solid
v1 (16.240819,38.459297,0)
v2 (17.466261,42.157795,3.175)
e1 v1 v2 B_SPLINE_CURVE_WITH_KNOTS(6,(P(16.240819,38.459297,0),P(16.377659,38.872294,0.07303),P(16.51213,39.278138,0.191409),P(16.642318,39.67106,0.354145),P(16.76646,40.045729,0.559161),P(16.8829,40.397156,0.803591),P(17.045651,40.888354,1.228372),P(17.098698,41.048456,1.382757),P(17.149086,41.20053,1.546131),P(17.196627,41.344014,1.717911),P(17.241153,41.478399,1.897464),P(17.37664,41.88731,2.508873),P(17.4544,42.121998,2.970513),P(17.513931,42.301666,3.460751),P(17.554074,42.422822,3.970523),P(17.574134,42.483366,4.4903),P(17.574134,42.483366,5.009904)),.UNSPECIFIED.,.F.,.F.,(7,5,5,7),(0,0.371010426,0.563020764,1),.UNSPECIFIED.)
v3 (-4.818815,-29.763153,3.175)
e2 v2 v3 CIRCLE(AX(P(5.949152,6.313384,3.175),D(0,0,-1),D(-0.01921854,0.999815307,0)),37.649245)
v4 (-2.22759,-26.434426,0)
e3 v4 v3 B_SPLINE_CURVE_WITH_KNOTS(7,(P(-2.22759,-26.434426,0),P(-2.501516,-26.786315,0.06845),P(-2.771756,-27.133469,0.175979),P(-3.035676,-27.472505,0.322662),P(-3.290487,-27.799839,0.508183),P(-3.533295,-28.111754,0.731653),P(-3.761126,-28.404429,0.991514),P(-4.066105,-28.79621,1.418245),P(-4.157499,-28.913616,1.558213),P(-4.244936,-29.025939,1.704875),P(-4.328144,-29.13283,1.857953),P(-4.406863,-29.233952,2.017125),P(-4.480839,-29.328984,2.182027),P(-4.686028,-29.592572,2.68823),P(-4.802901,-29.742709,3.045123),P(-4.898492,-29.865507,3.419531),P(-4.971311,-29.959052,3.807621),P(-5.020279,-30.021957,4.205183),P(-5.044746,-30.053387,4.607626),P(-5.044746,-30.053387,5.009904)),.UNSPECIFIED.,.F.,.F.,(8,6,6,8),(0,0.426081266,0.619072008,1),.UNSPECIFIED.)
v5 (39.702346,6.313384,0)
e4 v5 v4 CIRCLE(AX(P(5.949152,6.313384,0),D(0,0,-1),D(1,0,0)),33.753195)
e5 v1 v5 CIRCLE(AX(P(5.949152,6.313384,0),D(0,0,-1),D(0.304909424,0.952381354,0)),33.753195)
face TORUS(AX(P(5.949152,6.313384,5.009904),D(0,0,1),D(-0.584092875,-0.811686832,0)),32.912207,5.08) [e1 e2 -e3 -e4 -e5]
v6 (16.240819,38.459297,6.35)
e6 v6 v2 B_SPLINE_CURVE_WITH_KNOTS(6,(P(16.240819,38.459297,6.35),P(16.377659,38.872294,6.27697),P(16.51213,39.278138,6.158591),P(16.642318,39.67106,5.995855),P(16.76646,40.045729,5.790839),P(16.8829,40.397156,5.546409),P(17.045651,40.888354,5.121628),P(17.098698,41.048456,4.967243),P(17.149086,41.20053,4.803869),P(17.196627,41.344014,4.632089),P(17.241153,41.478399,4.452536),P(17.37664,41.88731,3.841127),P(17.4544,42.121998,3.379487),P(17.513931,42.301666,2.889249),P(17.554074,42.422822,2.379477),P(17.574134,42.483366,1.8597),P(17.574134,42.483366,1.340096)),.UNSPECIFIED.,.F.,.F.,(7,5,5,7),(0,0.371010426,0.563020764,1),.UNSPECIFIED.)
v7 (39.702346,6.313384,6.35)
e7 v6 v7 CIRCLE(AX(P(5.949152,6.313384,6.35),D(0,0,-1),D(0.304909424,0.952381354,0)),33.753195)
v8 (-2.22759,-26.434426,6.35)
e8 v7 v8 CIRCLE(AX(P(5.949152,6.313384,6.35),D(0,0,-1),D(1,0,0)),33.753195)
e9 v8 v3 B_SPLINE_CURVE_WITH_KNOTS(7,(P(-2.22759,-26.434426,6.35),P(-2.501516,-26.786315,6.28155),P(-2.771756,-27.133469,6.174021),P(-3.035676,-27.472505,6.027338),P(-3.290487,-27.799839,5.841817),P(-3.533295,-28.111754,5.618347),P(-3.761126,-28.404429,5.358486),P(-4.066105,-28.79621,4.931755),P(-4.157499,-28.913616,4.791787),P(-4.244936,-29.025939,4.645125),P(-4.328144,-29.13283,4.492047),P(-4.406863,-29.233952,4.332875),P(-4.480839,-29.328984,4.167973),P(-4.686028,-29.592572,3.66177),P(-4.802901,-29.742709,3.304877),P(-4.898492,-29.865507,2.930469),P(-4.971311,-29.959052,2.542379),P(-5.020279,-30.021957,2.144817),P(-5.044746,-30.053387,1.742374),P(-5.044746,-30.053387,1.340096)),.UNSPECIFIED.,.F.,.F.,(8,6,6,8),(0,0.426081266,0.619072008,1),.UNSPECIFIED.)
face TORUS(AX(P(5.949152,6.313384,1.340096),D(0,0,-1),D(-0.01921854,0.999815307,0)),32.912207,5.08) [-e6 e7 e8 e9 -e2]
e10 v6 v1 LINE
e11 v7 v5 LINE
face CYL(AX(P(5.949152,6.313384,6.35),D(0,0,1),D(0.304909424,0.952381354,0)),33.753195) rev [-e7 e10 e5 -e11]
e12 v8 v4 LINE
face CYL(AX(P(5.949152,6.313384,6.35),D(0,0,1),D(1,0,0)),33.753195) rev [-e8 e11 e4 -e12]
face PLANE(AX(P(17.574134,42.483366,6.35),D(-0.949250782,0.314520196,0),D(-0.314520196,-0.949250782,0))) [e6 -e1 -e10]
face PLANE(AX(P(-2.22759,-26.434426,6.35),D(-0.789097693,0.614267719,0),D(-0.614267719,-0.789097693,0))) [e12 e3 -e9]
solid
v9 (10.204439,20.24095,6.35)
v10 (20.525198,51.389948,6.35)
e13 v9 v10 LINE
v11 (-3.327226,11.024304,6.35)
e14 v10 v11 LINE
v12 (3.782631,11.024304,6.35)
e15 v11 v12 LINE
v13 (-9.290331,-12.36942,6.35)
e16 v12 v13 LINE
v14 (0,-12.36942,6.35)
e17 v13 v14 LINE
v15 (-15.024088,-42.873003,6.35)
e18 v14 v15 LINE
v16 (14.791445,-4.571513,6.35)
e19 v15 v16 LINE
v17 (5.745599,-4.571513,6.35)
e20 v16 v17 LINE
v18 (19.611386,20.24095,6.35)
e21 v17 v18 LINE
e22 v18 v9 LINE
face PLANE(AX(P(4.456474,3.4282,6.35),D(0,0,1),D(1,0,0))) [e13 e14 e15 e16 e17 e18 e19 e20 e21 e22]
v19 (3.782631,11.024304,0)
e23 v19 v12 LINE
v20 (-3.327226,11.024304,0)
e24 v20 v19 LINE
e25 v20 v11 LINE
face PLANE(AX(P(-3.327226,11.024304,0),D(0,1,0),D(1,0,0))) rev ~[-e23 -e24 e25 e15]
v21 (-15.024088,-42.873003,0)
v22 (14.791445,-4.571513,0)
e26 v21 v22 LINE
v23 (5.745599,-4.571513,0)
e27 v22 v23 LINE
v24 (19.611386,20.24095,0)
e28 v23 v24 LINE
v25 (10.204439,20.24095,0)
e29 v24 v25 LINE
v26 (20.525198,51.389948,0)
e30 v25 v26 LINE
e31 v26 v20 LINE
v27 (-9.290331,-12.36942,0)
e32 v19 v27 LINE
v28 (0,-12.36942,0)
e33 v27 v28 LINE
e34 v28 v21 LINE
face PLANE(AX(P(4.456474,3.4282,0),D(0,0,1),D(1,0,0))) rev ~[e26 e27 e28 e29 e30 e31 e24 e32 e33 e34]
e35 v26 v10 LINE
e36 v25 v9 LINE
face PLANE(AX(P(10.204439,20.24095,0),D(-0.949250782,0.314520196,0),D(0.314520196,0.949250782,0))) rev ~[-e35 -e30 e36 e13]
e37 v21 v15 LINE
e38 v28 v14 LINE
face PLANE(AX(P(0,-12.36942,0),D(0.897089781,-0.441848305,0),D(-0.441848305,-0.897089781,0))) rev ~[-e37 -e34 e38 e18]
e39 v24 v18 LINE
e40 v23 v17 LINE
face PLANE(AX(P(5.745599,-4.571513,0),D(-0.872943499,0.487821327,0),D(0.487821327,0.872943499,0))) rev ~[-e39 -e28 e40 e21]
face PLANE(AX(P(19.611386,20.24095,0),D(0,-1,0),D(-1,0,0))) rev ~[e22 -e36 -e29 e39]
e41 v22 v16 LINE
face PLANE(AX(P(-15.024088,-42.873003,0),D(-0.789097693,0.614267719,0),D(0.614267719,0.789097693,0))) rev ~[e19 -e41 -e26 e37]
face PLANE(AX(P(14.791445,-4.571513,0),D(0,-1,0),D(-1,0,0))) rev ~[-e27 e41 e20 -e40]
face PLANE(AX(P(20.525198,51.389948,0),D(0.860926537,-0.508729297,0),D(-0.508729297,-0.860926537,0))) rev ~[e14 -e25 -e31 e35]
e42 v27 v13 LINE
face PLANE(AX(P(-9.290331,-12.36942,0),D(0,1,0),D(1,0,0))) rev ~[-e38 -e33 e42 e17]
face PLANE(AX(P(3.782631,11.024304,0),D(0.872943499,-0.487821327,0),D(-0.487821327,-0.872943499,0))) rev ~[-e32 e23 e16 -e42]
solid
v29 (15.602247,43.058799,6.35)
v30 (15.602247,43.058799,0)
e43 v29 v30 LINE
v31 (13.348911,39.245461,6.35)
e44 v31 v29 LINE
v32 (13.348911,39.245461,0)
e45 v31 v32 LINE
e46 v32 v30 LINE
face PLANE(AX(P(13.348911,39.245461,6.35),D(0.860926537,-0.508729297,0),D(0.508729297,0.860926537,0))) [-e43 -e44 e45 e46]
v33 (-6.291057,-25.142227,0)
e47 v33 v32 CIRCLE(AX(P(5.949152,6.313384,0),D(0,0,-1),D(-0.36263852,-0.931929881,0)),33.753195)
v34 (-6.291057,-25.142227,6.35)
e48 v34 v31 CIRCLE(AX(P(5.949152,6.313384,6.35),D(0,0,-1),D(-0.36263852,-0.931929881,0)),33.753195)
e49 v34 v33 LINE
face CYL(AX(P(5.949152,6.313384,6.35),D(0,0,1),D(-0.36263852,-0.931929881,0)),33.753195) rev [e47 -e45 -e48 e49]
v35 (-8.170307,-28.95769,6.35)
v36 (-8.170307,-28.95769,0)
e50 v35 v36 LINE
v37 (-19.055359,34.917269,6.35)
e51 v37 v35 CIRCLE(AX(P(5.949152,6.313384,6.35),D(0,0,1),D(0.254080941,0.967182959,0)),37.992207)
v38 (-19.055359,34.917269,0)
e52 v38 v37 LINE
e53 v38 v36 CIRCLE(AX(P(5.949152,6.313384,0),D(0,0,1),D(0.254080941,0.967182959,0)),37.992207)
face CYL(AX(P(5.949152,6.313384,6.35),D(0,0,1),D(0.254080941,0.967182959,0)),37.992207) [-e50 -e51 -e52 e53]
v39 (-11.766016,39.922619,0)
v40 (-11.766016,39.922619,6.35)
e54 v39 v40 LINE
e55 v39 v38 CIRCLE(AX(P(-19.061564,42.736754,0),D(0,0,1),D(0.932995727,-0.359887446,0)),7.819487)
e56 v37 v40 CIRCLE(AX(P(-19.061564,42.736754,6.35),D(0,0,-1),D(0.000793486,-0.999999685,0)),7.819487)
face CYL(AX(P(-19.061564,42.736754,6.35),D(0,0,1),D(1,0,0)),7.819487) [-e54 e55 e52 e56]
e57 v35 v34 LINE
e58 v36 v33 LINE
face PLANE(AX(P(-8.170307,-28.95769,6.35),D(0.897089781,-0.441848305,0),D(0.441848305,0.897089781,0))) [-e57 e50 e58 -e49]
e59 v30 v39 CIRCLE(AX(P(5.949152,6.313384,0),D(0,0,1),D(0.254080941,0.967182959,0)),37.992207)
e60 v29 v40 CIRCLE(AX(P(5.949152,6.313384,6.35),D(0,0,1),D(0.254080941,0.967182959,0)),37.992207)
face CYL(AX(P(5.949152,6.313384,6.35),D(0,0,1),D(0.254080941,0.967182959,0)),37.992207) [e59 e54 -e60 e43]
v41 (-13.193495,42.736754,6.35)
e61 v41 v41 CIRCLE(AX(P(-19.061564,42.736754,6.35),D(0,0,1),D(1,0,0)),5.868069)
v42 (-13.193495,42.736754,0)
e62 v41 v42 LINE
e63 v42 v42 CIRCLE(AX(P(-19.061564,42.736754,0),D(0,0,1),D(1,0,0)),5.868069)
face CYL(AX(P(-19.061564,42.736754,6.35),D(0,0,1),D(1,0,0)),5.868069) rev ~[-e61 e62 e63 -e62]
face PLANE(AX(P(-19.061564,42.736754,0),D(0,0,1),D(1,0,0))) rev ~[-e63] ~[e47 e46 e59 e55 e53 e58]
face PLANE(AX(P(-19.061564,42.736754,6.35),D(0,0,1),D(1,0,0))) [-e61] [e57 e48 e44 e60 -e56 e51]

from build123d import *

# Parameters (mm, degrees)
F1_DEPTH    = 6.35
F3_DEPTH    = 6.35
F4_R        = 7.8194869238
F4_R_2      = 5.8680689484
F5_DEPTH    = 6.35
F6_T2_ANGLE = 216.8401406518
F6_T4_ANGLE = 216.8401406518


# Not quite as in the source:
# - a fillet or chamfer that OpenCascade refuses, or shapes differently, is made with other operations: its cross-section is extruded or revolved along the edge and cut away or added


with BuildPart() as f1:
    # F0 (on Top) → F1 (new body)
    with BuildSketch(Plane.XY):
        Polygon((10.2044390514, 20.2409497), (20.5251984298, 51.3899475336), (-3.3272264991, 11.0243037343), (3.7826313637, 11.0243037343), (-9.2903310433, -12.3694203794), (0, -12.3694203794), (-15.0240883231, -42.8730025887), (14.7914448753, -4.5715132728), (5.745598625, -4.5715132728), (19.6113856238, 20.2409497), align=None)
    extrude(amount=F1_DEPTH)


with BuildPart() as f3:
    # F2 (on face) → F3 (new body)
    with BuildSketch(Plane.XY.offset(6.35)):
        with BuildLine():
            ThreePointArc((-6.2910568685, -25.142226705), (-26.3355362631, 16.1610780131), (13.3489113778, 39.2454612683))
            Line((13.3489113778, 39.2454612683), (15.6022474373, 43.0587993675))
            ThreePointArc((15.6022474373, 43.0587993675), (-30.1282761074, 18.2224985015), (-8.1703070611, -28.9576903466))
            Line((-8.1703070611, -28.9576903466), (-6.2910568685, -25.142226705))
        make_face()
    extrude(amount=-F3_DEPTH)

    # F4 (on face) → F5 (join)
    with BuildSketch(Plane.XY.offset(6.35)):
        with Locations((-19.0615635365, 42.7367538214)):
            Circle(F4_R)
        with Locations((-19.0615635365, 42.7367538214)):
            Circle(F4_R_2, mode=Mode.SUBTRACT)
    extrude(amount=-F5_DEPTH)


with BuildPart() as f3b:
    # F2 (on face) → F3, piece 2 (new body)
    with BuildSketch(Plane.XY.offset(6.35)):
        with BuildLine():
            ThreePointArc((16.2408188754, 38.4592973202), (33.2131829481, 26.2118953895), (39.7023464178, 6.3133840449))
            ThreePointArc((39.7023464178, 6.3133840449), (26.7251834492, -20.2880192706), (-2.2275902486, -26.4344257227))
            Line((-2.2275902486, -26.4344257227), (-5.0447458233, -30.0533868002))
            ThreePointArc((-5.0447458233, -30.0533868002), (28.5956235275, -24.1914535774), (43.9413588571, 6.3133840449))
            ThreePointArc((43.9413588571, 6.3133840449), (36.6498565452, 28.693610287), (17.57413441, 42.4833658191))
            Line((17.57413441, 42.4833658191), (16.2408188754, 38.4592973202))
        make_face()
    extrude(amount=-F3_DEPTH)

    # F6: fillet of radius 5.08 on 2 edges, made by hand

    # F6_s1 → F6_t2 (revolve, cut)
    with BuildSketch(Plane(origin=(6.0682659835, 0.1166447559, 0), x_dir=(0, 0, 1), z_dir=(-0.9998153068, -0.01921854, 0))):
        with BuildLine():
            ThreePointArc((6.35, 39.9510787116), (4.6214204879, 42.98814587), (1.340095817, 44.190091151))
            Line((1.340095817, 44.190091151), (6.35, 44.190091151))
            Line((6.35, 44.190091151), (6.35, 39.9510787116))
        make_face()
    revolve(axis=Axis((5.9491517022, 6.3133840449, 6.35), (0, 0, -1)), revolution_arc=F6_T2_ANGLE, mode=Mode.SUBTRACT)

    # F6_s3 → F6_t4 (revolve, cut)
    with BuildSketch(Plane(origin=(0.9263339106, -0.6665933412, 0), x_dir=(0, 0, 1), z_dir=(-0.8116868319, 0.5840928752, 0))):
        with BuildLine():
            ThreePointArc((0, -25.1538468985), (1.7285795121, -28.1909140569), (5.009904183, -29.3928593379))
            Line((5.009904183, -29.3928593379), (0, -29.3928593379))
            Line((0, -29.3928593379), (0, -25.1538468985))
        make_face()
    revolve(axis=Axis((5.9491517022, 6.3133840449, 0), (0, 0, 1)), revolution_arc=F6_T4_ANGLE, mode=Mode.SUBTRACT)


solid = Compound([f1.part, f3.part, f3b.part])
